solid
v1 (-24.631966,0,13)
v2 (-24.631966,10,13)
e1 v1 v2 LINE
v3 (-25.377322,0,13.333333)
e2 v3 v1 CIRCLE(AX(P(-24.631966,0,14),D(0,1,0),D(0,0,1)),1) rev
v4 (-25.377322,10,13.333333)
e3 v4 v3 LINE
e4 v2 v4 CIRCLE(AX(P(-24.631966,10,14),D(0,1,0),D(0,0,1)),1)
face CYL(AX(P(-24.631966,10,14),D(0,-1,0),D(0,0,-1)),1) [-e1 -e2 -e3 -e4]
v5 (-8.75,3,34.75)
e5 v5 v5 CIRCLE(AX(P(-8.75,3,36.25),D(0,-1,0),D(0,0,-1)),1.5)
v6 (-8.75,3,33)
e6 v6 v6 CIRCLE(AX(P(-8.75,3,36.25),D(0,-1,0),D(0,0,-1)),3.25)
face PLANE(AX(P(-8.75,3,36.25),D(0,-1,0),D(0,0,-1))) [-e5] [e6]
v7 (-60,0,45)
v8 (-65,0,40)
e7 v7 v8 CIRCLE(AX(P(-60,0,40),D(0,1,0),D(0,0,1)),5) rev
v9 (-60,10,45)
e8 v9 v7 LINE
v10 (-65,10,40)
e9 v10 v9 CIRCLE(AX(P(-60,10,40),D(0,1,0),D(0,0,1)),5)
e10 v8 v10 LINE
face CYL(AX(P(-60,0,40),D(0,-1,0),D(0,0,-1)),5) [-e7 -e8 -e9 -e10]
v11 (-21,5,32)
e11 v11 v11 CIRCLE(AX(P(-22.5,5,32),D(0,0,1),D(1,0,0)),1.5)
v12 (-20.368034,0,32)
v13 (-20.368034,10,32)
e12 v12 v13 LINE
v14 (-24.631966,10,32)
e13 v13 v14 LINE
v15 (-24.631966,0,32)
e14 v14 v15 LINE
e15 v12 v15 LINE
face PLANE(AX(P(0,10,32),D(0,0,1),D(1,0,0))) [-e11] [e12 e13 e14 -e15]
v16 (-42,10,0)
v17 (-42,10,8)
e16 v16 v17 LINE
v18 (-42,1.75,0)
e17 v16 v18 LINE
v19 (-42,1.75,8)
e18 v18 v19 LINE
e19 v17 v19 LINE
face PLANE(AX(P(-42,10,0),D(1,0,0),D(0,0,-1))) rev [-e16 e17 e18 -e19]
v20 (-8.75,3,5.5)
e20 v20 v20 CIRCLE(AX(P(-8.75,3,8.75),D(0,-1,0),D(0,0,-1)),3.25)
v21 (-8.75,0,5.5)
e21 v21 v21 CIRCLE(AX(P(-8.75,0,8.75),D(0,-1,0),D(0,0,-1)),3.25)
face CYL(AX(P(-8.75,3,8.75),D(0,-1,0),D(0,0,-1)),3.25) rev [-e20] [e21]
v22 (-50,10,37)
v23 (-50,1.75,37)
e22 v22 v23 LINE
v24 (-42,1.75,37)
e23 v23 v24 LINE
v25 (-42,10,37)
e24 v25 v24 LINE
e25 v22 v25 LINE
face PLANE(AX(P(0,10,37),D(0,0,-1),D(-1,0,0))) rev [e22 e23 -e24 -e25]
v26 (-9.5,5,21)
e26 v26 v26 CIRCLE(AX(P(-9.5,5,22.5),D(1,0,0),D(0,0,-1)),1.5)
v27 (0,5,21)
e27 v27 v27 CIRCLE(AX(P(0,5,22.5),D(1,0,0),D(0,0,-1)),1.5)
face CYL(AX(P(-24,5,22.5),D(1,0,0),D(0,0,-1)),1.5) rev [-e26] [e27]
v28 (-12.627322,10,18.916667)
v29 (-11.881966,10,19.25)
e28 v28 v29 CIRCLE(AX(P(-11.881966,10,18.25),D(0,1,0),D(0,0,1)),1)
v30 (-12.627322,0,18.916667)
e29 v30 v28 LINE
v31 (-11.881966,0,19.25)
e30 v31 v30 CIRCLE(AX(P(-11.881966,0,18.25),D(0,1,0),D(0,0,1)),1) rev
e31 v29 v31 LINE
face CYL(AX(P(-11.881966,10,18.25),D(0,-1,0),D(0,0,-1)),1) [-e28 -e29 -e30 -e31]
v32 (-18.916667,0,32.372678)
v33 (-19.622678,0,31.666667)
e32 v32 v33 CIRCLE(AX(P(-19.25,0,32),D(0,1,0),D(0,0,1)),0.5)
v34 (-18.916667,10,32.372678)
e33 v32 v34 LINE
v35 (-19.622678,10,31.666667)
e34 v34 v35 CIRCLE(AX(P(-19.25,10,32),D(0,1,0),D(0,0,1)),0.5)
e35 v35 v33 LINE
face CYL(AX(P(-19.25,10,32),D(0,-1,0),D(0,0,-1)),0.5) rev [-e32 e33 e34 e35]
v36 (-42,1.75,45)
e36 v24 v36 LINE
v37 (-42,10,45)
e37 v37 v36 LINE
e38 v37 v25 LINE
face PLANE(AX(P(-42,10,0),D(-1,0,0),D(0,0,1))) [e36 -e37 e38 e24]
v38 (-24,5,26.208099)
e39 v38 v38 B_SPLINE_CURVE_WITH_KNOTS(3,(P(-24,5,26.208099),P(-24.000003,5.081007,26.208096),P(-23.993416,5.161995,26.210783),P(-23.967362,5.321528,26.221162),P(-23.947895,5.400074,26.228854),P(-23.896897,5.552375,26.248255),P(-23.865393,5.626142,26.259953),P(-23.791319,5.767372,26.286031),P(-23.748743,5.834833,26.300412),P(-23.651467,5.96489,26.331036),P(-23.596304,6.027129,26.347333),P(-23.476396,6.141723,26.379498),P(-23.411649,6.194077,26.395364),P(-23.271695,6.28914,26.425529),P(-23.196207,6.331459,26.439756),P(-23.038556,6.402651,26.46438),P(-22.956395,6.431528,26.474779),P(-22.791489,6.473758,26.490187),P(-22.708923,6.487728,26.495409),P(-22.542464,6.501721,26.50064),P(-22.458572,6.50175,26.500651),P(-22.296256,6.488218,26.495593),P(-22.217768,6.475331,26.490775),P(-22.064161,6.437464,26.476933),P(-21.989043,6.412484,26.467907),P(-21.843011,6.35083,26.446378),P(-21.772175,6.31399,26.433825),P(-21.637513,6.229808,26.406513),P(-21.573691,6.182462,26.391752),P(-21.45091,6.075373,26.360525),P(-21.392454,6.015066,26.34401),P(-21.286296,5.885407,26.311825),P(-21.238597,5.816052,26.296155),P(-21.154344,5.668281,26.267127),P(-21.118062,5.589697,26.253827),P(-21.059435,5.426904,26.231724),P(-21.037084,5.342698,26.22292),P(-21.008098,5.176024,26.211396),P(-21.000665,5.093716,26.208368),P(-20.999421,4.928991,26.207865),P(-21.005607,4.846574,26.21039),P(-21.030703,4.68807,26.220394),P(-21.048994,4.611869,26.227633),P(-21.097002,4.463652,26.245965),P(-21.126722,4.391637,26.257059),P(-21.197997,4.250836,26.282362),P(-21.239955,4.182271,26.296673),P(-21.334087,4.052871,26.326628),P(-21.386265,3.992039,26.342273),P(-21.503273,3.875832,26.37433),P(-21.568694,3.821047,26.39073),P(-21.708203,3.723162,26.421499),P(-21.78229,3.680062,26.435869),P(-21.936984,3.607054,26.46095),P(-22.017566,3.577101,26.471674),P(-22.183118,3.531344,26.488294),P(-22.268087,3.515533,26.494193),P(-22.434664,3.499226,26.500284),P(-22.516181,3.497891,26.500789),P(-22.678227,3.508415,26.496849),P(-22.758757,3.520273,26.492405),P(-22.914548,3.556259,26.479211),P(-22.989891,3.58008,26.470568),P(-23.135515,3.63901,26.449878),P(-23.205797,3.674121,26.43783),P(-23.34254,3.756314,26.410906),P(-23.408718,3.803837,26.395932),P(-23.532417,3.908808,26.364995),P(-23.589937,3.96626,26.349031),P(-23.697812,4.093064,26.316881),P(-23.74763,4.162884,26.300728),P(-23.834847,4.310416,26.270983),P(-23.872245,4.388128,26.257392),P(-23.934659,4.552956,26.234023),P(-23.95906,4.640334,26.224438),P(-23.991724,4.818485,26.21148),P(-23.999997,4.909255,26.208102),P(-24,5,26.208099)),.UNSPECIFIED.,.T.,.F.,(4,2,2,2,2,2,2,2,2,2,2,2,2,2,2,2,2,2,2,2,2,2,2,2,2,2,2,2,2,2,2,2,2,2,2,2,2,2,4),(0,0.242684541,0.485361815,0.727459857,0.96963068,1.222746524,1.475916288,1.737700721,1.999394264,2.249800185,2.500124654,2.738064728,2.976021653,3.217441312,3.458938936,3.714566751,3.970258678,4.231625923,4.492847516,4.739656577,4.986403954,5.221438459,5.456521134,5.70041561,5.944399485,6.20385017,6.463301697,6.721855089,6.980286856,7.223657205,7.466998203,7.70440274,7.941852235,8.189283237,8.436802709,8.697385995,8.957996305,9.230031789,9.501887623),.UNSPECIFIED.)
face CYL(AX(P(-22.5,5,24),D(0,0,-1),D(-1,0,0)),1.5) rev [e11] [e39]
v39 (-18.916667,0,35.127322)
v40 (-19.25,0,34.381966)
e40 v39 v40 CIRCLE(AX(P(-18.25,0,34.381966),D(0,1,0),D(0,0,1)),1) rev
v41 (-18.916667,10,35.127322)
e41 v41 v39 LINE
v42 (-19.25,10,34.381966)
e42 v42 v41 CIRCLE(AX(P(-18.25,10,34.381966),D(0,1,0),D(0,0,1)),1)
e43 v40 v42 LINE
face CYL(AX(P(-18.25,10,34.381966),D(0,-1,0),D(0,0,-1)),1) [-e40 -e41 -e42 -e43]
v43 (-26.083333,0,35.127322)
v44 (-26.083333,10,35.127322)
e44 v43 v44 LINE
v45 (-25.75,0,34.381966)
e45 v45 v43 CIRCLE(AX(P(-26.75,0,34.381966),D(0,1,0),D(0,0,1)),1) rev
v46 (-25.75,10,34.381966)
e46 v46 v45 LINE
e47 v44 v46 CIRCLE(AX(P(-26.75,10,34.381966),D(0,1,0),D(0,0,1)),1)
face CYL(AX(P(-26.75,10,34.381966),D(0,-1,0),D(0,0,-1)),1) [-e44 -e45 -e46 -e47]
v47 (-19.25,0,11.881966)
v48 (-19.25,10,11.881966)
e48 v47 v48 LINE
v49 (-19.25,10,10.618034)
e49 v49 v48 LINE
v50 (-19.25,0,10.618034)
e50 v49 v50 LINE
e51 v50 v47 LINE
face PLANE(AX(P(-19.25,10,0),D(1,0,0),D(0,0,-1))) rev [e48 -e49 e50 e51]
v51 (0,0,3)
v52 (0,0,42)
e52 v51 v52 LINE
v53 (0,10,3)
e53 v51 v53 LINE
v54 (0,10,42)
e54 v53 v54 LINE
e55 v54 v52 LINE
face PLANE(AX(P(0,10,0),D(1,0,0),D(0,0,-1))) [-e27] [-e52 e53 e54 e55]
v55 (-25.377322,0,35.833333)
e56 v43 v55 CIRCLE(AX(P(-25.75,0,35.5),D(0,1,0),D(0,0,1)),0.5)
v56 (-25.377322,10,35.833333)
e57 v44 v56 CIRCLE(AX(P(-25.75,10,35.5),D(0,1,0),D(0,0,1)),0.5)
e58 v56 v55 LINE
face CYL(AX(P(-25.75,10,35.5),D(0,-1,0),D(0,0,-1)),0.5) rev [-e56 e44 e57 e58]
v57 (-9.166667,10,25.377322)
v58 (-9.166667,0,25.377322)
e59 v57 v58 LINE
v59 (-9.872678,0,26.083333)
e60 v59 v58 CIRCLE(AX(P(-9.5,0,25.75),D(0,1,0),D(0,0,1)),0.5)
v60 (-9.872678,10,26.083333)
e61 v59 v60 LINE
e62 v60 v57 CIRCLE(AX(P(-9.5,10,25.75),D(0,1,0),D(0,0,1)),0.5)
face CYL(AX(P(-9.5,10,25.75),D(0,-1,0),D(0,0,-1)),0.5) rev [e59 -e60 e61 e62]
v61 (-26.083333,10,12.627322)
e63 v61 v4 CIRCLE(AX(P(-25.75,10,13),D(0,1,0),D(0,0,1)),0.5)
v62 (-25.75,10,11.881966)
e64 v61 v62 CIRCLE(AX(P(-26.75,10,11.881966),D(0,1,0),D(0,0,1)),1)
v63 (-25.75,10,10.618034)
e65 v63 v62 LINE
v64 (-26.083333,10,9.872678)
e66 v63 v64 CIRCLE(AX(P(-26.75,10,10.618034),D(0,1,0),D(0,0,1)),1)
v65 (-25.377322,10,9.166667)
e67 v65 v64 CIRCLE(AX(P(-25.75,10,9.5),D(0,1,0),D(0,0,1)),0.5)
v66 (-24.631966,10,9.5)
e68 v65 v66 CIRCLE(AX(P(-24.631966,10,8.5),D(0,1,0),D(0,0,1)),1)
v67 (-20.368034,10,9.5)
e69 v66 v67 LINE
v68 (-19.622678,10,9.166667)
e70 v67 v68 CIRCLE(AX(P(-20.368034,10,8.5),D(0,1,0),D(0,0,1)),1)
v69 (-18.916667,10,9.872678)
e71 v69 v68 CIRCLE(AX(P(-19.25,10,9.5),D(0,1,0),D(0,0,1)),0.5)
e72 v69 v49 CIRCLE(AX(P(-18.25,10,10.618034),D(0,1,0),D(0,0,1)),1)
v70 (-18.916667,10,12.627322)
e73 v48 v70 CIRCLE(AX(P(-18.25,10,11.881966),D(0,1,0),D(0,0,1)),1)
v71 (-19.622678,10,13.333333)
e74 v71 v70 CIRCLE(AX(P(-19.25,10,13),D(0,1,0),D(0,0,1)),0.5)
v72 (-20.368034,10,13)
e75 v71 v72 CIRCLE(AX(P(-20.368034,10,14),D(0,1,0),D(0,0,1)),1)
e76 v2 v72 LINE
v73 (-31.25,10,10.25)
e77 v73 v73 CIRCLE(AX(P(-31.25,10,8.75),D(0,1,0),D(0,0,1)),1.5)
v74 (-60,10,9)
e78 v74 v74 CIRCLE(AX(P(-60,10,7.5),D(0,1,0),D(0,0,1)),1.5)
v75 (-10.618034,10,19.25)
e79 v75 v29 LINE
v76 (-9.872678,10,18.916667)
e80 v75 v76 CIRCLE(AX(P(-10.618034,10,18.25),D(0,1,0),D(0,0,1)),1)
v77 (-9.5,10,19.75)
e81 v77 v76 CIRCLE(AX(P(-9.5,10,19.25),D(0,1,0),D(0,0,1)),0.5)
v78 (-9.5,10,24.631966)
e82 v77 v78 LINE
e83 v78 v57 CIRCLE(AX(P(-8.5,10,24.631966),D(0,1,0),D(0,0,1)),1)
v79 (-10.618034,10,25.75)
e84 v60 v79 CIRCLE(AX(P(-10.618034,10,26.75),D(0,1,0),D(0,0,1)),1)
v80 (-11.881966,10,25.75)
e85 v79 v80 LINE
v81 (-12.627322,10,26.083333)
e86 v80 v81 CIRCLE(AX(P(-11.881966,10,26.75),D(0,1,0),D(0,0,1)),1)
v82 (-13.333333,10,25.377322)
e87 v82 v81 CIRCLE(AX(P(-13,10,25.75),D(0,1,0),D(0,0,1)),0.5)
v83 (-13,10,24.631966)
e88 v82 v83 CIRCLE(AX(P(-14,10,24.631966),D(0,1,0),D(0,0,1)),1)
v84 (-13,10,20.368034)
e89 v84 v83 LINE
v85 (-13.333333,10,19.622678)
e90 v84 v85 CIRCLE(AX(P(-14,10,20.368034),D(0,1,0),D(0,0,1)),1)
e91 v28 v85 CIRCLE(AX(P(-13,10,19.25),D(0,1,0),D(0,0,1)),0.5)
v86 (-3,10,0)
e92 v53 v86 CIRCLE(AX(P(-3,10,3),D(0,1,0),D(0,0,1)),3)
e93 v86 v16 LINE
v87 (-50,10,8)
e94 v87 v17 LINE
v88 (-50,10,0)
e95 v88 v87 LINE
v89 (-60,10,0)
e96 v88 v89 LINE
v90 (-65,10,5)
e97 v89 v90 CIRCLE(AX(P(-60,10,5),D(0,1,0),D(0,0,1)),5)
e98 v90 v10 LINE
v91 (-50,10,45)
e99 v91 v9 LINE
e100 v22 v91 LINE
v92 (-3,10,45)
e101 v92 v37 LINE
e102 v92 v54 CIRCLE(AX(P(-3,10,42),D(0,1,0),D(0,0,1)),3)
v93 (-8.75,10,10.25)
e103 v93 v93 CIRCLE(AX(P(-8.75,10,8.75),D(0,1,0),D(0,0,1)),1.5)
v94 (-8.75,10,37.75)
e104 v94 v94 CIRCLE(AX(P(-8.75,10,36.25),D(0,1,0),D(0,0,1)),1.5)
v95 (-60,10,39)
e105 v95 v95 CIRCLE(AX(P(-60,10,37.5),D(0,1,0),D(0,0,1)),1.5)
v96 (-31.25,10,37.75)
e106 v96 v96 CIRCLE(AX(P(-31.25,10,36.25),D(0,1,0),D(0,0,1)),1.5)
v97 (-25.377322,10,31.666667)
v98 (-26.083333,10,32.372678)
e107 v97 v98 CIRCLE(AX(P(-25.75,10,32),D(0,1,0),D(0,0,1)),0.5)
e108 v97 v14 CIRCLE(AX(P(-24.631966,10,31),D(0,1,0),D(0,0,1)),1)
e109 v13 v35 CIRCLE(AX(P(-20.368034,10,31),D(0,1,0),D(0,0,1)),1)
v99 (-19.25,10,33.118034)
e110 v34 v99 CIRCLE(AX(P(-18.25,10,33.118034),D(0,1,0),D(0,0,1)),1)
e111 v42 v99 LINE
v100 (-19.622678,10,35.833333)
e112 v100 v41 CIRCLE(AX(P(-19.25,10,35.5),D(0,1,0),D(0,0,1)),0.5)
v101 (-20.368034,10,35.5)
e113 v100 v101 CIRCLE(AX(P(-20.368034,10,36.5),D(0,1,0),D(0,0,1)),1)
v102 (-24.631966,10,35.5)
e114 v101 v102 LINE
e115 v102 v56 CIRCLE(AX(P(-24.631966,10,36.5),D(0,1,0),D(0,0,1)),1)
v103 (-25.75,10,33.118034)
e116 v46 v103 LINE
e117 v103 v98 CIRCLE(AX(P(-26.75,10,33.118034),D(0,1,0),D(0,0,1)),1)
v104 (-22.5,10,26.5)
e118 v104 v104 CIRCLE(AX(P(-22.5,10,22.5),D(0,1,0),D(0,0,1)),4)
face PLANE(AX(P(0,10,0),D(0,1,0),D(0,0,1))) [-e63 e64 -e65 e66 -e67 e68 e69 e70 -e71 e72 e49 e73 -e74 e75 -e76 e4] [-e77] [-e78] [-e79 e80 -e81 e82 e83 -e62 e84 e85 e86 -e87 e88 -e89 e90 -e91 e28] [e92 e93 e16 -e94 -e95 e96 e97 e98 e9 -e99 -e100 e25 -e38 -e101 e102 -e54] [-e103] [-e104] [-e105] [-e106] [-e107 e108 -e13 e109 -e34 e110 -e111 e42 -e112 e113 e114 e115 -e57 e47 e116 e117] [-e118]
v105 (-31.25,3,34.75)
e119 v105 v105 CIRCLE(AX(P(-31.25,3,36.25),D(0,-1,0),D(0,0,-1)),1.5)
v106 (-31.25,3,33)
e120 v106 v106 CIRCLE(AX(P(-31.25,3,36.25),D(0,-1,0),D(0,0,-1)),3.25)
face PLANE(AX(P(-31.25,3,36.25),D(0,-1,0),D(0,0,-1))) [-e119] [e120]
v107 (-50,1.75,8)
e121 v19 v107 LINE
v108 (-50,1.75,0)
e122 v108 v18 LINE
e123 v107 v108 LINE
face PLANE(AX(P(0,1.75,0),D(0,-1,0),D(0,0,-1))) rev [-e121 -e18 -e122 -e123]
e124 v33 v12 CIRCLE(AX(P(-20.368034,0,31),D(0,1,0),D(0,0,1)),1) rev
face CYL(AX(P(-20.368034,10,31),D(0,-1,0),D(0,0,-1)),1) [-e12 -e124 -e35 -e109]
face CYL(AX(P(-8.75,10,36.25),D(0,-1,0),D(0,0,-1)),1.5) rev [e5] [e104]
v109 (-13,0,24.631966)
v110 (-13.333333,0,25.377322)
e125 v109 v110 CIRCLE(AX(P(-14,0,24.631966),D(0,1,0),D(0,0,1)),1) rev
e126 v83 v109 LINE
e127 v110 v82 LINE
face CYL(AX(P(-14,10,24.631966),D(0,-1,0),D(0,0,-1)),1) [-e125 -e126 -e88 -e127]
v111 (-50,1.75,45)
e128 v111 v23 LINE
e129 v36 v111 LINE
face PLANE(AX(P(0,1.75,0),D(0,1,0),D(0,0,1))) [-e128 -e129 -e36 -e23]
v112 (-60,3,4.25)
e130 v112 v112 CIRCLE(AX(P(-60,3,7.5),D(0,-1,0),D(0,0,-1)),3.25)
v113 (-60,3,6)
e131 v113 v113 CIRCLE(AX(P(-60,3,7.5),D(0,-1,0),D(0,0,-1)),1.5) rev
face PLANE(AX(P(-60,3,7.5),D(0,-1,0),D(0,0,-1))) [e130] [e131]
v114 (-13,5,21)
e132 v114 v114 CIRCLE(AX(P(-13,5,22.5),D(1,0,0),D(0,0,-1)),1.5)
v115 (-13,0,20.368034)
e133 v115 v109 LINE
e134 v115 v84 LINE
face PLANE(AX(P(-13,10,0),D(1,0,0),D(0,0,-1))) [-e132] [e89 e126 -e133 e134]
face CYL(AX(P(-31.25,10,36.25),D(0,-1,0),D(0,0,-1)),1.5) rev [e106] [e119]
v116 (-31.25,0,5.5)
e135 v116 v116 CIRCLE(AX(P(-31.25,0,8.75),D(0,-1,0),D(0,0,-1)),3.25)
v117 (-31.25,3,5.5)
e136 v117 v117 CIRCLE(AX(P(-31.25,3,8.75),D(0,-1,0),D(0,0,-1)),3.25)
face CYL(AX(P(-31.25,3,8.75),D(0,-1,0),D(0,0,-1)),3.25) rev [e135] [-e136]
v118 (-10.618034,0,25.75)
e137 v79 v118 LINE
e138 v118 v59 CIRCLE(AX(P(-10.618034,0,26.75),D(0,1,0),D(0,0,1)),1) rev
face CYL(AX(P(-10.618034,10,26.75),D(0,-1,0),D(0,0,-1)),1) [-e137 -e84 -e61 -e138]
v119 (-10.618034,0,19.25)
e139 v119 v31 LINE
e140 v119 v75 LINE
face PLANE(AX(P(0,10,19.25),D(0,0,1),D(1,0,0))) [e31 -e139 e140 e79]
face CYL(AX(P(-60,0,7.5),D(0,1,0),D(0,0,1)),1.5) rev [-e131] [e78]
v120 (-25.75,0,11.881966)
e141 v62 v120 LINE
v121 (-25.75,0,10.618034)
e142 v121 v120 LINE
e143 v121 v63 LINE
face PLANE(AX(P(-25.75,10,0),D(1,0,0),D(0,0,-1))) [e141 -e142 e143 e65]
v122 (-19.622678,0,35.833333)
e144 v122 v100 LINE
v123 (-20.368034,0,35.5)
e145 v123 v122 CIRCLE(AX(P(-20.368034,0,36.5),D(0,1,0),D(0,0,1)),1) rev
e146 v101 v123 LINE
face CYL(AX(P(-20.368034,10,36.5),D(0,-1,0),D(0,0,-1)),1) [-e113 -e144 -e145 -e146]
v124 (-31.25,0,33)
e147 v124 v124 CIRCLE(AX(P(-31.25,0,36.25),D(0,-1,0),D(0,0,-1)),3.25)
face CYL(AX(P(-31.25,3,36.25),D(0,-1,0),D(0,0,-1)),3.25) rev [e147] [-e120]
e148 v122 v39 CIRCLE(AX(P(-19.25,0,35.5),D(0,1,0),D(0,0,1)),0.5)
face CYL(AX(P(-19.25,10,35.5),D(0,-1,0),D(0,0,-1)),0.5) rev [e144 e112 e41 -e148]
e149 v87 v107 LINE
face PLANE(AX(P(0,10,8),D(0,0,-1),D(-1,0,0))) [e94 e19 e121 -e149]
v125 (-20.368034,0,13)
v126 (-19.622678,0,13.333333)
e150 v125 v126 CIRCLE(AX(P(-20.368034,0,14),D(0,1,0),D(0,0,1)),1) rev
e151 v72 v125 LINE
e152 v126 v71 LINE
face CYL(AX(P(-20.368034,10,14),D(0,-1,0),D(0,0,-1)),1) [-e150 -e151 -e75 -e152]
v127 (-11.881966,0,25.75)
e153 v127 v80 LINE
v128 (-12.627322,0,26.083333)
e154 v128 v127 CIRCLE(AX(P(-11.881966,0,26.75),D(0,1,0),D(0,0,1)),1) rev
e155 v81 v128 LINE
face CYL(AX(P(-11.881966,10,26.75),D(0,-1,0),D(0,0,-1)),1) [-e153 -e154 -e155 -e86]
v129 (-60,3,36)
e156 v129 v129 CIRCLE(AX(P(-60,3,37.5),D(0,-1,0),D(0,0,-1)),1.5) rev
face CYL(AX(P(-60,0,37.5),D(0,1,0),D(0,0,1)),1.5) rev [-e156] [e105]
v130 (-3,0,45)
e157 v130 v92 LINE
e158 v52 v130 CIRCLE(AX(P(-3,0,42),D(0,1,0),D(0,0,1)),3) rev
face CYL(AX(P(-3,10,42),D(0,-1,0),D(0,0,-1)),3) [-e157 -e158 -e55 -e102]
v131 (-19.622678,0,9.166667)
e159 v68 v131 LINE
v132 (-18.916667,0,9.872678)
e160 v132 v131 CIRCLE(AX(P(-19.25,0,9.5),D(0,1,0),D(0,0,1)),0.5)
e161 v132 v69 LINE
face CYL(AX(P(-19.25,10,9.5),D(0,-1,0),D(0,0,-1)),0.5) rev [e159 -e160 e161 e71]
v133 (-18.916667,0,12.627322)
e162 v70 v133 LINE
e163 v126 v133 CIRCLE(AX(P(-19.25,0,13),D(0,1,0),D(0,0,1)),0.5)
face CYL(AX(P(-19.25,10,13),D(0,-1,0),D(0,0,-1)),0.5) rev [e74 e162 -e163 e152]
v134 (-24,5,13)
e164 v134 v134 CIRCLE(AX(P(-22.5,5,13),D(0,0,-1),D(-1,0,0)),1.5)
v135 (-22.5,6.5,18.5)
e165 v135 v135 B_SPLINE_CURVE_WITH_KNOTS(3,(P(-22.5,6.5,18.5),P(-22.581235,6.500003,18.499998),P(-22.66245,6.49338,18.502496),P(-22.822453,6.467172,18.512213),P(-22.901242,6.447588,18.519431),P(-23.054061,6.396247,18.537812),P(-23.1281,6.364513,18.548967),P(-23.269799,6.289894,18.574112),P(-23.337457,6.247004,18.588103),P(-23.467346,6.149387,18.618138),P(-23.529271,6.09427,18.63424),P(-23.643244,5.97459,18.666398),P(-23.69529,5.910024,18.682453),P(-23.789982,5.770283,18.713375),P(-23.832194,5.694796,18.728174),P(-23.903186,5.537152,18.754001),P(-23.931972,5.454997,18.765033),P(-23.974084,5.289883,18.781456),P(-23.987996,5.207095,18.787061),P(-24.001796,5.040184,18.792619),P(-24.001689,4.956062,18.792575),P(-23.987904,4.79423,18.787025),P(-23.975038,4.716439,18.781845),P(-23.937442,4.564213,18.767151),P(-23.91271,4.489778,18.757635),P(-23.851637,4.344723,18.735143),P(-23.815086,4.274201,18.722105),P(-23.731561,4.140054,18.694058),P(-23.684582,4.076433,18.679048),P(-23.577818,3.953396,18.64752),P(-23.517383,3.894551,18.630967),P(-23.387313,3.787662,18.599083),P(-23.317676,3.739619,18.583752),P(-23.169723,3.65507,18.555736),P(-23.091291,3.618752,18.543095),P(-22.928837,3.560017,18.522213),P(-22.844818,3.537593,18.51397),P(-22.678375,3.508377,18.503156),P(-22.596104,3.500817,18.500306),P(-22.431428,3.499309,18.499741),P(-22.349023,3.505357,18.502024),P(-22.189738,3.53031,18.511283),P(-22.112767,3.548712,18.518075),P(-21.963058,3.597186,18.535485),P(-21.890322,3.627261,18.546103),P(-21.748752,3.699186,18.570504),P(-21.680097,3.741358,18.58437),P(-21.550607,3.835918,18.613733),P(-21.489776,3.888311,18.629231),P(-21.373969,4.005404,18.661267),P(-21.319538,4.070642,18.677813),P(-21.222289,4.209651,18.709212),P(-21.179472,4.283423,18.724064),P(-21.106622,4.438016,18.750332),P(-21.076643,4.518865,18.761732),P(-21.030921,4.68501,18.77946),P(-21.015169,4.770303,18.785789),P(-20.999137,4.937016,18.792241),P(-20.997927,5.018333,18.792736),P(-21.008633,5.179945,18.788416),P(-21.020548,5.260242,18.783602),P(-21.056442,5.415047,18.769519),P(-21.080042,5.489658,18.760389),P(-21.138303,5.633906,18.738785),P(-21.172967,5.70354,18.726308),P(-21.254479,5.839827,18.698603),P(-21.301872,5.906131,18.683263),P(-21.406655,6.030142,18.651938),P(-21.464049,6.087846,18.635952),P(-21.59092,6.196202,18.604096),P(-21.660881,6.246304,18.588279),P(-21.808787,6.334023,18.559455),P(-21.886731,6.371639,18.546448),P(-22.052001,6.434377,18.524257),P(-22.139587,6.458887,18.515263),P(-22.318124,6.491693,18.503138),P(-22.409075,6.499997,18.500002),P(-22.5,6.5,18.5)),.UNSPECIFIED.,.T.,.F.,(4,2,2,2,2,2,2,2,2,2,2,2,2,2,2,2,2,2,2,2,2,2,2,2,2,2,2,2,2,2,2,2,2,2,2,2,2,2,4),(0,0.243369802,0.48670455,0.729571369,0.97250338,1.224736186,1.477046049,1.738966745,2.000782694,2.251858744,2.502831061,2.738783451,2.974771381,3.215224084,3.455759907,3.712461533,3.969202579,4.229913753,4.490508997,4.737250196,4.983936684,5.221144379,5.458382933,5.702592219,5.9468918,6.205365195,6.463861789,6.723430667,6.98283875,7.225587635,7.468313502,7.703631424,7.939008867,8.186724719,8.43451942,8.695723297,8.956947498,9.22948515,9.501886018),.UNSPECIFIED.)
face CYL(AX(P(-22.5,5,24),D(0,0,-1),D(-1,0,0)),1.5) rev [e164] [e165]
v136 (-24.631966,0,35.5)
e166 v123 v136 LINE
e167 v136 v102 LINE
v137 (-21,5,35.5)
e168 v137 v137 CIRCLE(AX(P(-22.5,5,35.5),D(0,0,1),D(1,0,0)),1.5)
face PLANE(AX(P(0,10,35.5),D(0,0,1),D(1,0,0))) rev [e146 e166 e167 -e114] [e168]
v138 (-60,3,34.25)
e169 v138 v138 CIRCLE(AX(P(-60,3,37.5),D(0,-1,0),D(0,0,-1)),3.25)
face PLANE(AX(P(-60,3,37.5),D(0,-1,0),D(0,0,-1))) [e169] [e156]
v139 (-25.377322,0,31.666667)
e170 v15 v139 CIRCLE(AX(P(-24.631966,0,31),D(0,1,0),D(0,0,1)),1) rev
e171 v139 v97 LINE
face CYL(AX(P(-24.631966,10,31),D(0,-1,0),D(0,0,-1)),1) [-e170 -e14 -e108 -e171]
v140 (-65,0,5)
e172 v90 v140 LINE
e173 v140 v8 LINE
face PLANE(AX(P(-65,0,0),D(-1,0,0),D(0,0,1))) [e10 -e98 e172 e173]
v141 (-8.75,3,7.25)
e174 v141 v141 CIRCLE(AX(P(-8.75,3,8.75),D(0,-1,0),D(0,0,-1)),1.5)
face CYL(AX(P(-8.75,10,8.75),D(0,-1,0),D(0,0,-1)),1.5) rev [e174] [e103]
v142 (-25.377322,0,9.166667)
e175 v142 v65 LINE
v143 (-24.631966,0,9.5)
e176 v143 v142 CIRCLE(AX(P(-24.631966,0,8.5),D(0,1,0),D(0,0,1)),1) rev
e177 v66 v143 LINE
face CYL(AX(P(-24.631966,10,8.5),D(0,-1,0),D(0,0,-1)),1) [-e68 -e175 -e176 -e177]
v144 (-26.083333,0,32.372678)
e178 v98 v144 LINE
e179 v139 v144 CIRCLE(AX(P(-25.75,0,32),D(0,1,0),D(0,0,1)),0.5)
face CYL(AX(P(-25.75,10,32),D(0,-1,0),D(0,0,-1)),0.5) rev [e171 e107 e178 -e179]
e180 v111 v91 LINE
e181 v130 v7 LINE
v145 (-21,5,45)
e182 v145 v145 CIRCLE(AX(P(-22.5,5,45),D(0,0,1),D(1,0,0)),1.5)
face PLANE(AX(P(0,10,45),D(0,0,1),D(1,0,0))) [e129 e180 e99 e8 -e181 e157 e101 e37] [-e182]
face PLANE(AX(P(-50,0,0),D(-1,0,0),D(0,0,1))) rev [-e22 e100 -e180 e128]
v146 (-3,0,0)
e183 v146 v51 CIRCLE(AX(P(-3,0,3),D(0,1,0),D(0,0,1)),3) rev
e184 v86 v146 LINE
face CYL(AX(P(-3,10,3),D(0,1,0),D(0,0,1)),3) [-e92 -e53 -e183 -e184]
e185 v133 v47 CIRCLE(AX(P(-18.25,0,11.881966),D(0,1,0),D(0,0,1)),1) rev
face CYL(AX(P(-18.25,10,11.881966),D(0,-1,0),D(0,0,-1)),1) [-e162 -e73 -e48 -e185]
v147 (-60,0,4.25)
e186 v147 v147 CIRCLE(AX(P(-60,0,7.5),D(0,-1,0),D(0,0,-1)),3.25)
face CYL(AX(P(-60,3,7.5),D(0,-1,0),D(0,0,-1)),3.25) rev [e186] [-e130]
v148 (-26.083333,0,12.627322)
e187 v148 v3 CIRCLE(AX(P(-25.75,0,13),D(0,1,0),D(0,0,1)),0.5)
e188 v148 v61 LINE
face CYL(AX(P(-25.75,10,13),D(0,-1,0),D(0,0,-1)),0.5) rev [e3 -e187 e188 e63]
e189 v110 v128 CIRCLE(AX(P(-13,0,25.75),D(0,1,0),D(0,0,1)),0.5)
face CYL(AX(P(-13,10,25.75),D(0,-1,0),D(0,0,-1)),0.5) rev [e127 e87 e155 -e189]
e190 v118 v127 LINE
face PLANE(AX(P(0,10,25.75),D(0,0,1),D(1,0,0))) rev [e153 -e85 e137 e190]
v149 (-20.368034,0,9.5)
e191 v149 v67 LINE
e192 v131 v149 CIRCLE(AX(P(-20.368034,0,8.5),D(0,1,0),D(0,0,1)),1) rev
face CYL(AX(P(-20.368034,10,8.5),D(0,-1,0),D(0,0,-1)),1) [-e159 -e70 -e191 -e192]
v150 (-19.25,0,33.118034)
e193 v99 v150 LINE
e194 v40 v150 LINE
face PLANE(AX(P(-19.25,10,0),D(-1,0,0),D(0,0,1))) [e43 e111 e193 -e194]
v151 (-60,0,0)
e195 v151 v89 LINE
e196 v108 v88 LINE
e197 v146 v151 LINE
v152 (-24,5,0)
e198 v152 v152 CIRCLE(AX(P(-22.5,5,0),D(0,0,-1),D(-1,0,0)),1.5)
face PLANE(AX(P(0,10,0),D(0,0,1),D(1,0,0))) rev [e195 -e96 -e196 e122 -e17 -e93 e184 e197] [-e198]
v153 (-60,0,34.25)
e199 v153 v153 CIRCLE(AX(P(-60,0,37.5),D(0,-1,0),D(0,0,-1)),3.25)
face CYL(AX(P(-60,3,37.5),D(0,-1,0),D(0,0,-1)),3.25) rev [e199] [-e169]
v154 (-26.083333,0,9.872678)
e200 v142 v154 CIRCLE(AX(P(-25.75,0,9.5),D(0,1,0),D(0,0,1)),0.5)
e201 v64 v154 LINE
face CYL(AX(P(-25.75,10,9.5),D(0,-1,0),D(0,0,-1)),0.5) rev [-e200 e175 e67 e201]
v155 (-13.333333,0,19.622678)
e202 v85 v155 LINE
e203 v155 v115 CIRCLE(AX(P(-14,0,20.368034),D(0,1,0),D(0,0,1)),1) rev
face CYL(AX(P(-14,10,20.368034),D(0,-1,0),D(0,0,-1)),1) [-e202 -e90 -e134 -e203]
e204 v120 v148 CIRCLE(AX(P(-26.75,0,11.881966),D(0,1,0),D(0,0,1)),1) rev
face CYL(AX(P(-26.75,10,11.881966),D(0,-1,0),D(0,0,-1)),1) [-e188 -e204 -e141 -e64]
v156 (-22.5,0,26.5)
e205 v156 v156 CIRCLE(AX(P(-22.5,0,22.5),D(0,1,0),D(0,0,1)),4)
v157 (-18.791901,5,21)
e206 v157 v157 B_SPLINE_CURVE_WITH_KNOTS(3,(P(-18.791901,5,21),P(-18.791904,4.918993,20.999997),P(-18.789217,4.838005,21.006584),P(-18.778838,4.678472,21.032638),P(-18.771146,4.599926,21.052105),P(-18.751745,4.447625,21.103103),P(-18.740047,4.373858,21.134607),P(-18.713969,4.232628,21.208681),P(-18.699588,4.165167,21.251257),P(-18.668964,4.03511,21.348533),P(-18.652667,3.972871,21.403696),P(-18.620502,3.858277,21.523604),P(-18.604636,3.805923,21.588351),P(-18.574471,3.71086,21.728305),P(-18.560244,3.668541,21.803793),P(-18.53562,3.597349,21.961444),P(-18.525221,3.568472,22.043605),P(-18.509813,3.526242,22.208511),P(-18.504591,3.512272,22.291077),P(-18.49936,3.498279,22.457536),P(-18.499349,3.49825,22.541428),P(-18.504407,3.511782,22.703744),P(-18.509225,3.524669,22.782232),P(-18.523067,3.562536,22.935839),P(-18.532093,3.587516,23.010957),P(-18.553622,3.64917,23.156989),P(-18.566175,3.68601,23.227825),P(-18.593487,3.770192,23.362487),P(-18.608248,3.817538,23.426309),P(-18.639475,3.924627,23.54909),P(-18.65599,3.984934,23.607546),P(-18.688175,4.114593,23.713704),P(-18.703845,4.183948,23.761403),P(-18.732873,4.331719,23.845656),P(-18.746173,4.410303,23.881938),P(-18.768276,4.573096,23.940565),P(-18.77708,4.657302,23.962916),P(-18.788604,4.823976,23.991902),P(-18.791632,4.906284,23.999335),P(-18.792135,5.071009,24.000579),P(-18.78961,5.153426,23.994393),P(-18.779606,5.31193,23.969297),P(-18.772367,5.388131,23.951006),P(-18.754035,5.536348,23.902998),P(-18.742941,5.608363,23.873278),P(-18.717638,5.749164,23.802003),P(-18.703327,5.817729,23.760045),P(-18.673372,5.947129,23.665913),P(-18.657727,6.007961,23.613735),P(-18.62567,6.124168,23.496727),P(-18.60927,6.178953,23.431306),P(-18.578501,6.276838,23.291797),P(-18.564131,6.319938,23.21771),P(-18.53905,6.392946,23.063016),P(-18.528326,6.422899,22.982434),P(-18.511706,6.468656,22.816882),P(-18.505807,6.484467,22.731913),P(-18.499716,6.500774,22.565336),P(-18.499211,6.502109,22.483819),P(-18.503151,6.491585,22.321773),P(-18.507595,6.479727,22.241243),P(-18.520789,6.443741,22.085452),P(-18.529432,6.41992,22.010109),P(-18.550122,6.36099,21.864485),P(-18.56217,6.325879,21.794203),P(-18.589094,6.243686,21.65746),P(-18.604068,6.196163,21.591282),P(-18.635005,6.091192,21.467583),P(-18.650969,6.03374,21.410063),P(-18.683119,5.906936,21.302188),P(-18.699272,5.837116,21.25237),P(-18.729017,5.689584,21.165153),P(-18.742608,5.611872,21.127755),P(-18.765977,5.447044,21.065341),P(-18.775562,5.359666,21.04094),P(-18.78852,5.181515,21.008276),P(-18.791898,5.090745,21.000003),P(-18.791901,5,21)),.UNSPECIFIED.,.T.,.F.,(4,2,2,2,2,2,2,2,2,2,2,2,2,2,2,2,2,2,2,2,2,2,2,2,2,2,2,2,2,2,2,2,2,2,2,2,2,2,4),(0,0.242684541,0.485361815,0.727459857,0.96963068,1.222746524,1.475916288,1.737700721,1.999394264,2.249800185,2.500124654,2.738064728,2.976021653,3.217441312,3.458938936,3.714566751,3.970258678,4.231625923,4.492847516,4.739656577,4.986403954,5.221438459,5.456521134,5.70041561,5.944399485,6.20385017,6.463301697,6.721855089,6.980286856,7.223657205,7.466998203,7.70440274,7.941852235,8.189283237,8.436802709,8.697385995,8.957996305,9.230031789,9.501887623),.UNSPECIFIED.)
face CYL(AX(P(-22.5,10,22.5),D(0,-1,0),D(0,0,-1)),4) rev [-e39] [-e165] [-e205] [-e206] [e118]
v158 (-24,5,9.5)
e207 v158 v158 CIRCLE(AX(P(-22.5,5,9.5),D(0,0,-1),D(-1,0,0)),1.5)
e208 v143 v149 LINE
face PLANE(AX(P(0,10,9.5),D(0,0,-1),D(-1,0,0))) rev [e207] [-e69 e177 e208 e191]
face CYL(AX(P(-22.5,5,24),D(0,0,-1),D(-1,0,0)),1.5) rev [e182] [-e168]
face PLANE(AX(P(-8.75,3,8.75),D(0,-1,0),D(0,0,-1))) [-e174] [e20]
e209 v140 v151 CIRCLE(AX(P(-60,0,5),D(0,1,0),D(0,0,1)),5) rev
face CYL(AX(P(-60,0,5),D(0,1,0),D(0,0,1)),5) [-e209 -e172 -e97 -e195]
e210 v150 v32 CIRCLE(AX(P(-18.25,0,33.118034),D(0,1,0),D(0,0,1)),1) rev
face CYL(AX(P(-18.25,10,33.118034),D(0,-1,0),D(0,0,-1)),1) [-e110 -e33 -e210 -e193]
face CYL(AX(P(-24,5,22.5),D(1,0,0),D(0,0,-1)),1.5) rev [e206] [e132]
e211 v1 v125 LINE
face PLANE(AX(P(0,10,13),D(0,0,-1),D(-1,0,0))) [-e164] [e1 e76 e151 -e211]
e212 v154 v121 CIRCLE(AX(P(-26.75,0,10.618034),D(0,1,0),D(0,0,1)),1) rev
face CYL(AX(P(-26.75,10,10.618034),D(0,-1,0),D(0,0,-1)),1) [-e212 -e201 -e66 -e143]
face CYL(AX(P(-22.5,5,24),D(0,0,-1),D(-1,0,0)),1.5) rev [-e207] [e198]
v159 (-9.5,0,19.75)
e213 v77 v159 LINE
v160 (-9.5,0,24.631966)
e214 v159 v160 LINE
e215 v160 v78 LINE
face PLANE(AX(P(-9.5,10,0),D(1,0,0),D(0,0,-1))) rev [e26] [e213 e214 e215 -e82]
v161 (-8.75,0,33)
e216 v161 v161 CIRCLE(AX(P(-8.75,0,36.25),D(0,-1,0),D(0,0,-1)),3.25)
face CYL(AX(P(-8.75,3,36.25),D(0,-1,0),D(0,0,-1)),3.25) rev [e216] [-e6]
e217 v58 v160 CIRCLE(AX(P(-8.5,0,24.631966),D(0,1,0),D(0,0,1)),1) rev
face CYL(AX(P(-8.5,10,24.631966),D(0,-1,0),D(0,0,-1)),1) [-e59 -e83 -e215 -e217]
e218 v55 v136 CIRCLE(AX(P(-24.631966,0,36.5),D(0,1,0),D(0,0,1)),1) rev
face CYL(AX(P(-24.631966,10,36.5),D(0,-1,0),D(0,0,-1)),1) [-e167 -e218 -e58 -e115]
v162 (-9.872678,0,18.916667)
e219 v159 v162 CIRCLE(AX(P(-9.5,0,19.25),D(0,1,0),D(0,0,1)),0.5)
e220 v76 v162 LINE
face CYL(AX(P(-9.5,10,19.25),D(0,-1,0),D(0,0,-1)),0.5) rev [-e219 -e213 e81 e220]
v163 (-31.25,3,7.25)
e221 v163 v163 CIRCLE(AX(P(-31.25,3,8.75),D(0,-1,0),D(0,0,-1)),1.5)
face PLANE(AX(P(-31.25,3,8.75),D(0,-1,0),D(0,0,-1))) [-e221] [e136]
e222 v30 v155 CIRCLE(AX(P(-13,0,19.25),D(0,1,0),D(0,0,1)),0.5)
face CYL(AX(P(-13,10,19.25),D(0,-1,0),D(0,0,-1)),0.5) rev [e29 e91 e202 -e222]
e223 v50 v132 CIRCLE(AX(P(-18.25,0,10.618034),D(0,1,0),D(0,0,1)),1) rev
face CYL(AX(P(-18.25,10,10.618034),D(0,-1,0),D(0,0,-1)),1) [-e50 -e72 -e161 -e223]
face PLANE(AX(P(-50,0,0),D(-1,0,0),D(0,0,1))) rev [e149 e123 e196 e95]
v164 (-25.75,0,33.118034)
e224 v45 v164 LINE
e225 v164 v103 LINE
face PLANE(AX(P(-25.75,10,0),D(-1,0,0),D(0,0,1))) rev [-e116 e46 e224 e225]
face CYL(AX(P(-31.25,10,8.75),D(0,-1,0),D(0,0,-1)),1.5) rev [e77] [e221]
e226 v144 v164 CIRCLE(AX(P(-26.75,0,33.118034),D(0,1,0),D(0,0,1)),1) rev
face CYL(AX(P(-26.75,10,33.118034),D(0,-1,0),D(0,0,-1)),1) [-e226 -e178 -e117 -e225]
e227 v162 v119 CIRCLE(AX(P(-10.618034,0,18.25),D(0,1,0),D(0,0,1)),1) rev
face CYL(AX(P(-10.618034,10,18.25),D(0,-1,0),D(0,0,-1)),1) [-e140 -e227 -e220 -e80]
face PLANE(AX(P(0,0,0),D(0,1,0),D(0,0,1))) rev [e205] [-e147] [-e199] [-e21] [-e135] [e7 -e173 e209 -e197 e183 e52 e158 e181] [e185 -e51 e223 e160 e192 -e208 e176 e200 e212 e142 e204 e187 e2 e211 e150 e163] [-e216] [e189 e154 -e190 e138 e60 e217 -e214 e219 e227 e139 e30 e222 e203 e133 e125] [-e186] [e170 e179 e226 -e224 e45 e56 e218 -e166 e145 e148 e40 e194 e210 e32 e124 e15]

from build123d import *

# Parameters (mm, degrees)
SKETCH1_R             = 4
SKETCH1_R_2           = 1.5
BOSS_EXTRUDE1_DEPTH   = 10
FILLET1_R             = 3
FILLET2_R             = 1
CUT_EXTRUDE1_DEPTH    = 24
CIRPATTERN1_OUTLINE_R = 1.5
CIRPATTERN1_DEPTH     = 45
SKETCH3_W             = 15
SKETCH3_H             = 45
SKETCH3_R             = 1.5
BOSS_EXTRUDE2_DEPTH   = 10
FILLET3_R             = 5
SKETCH4_R             = 3.25
CUT_EXTRUDE2_DEPTH    = 3
SKETCH5_W             = 8
SKETCH5_H             = 8
BOSS_EXTRUDE3_DEPTH   = 1.75


# Read off the part's stored shape, not the designer's step: CirPattern1
with BuildPart() as part:
    # Sketch1 → Boss-Extrude1 (new body)
    with BuildSketch(Plane(origin=(0, 0, 0), x_dir=(1, 0, 0), z_dir=(0, 1, 0))):
        Polygon((0, 0), (-42, 0), (-42, -8), (-50, -8), (-50, -37), (-42, -37), (-42, -45), (0, -45), align=None)
        with Locations(Location((-22.5, -22.5, 0), (0, 0, 270))):
            Circle(SKETCH1_R, mode=Mode.SUBTRACT)
        with BuildLine():
            Line((-19.75, -13), (-25.25, -13))
            ThreePointArc((-25.25, -13), (-26.103553391, -13.353553391), (-25.75, -12.5))
            Line((-25.75, -12.5), (-25.75, -10))
            ThreePointArc((-25.75, -10), (-26.103553391, -9.146446609), (-25.25, -9.5))
            Line((-25.25, -9.5), (-19.75, -9.5))
            ThreePointArc((-19.75, -9.5), (-18.896446609, -9.146446609), (-19.25, -10))
            Line((-19.25, -10), (-19.25, -12.5))
            ThreePointArc((-19.25, -12.5), (-18.896446609, -13.353553391), (-19.75, -13))
        make_face(mode=Mode.SUBTRACT)
        with Locations(Location((-31.25, -8.75, 0), (0, 0, 270))):
            Circle(SKETCH1_R_2, mode=Mode.SUBTRACT)
        with Locations(Location((-31.25, -36.25, 0), (0, 0, 270))):
            Circle(SKETCH1_R_2, mode=Mode.SUBTRACT)
        with Locations(Location((-8.75, -36.25, 0), (0, 0, 270))):
            Circle(SKETCH1_R_2, mode=Mode.SUBTRACT)
        with Locations(Location((-8.75, -8.75, 0), (0, 0, 270))):
            Circle(SKETCH1_R_2, mode=Mode.SUBTRACT)
        with BuildLine():
            Line((-9.5, -19.75), (-9.5, -25.25))
            ThreePointArc((-9.5, -25.25), (-9.146446609, -26.103553391), (-10, -25.75))
            Line((-10, -25.75), (-12.5, -25.75))
            ThreePointArc((-12.5, -25.75), (-13.353553391, -26.103553391), (-13, -25.25))
            Line((-13, -25.25), (-13, -19.75))
            ThreePointArc((-13, -19.75), (-13.353553391, -18.896446609), (-12.5, -19.25))
            Line((-12.5, -19.25), (-10, -19.25))
            ThreePointArc((-10, -19.25), (-9.146446609, -18.896446609), (-9.5, -19.75))
        make_face(mode=Mode.SUBTRACT)
        with BuildLine():
            ThreePointArc((-19.25, -35), (-18.896446609, -35.853553391), (-19.75, -35.5))
            Line((-19.75, -35.5), (-25.25, -35.5))
            ThreePointArc((-25.25, -35.5), (-26.103553391, -35.853553391), (-25.75, -35))
            Line((-25.75, -35), (-25.75, -32.5))
            ThreePointArc((-25.75, -32.5), (-26.103553391, -31.646446609), (-25.25, -32))
            Line((-25.25, -32), (-19.75, -32))
            ThreePointArc((-19.75, -32), (-18.896446609, -31.646446609), (-19.25, -32.5))
            Line((-19.25, -32.5), (-19.25, -35))
        make_face(mode=Mode.SUBTRACT)
    extrude(amount=BOSS_EXTRUDE1_DEPTH)

    # Fillet1
    fillet1_edges = [part.edges().sort_by_distance(p)[0] for p in [
        (0, 5, 45),
        (0, 5, 0),
    ]]
    fillet(fillet1_edges, radius=FILLET1_R)

    # Fillet2
    fillet2_edges = [part.edges().sort_by_distance(p)[0] for p in [
        (-25.75, 5, 32.5),
        (-25.75, 5, 35),
        (-25.25, 5, 35.5),
        (-19.75, 5, 35.5),
        (-19.25, 5, 35),
        (-19.25, 5, 32.5),
        (-19.75, 5, 32),
        (-25.25, 5, 32),
        (-19.25, 5, 12.5),
        (-19.25, 5, 10),
        (-19.75, 5, 9.5),
        (-25.25, 5, 9.5),
        (-25.75, 5, 10),
        (-25.75, 5, 12.5),
        (-25.25, 5, 13),
        (-19.75, 5, 13),
        (-10, 5, 19.25),
        (-12.5, 5, 19.25),
        (-13, 5, 19.75),
        (-13, 5, 25.25),
        (-12.5, 5, 25.75),
        (-10, 5, 25.75),
        (-9.5, 5, 25.25),
    ]]
    fillet(fillet2_edges, radius=FILLET2_R)

    # Sketch2 → Cut-Extrude1 (cut)
    with BuildSketch(Plane(origin=(0, 0, 0), x_dir=(0, 0, -1), z_dir=(1, 0, 0))):
        with BuildLine():
            ThreePointArc((-21, 5), (-21.439339828, 6.060660172), (-22.5, 6.5))
            Line((-22.5, 6.5), (-22.5, 3.5))
            ThreePointArc((-22.5, 3.5), (-21.439339828, 3.939339828), (-21, 5))
        make_face()
        with BuildLine():
            Line((-22.5, 3.5), (-22.5, 6.5))
            ThreePointArc((-22.5, 6.5), (-24, 5), (-22.5, 3.5))
        make_face()
    extrude(amount=-CUT_EXTRUDE1_DEPTH, mode=Mode.SUBTRACT)

    # CirPattern1 outline → CirPattern1 (cut)
    with BuildSketch(Plane.XY):
        with Locations((-22.5, 5)):
            Circle(CIRPATTERN1_OUTLINE_R)
    extrude(amount=CIRPATTERN1_DEPTH, mode=Mode.SUBTRACT)

    # Sketch3 → Boss-Extrude2 (add)
    with BuildSketch(Plane(origin=(0, 10, 0), x_dir=(1, 0, 0), z_dir=(0, 1, 0))):
        with Locations((-57.5, -22.5)):
            Rectangle(SKETCH3_W, SKETCH3_H)
        with Locations(Location((-60, -37.5, 0), (0, 0, 270))):
            Circle(SKETCH3_R, mode=Mode.SUBTRACT)
        with Locations(Location((-60, -7.5, 0), (0, 0, 270))):
            Circle(SKETCH3_R, mode=Mode.SUBTRACT)
    extrude(amount=-BOSS_EXTRUDE2_DEPTH)

    # Fillet3
    fillet3_edges = [part.edges().sort_by_distance(p)[0] for p in [
        (-65, 5, 0),
        (-65, 5, 45),
    ]]
    fillet(fillet3_edges, radius=FILLET3_R)

    # Sketch4 → Cut-Extrude2 (cut)
    with BuildSketch(Plane.XZ):
        with Locations(Location((-31.25, 36.25, 0), (0, 0, 270))):
            Circle(SKETCH4_R)
        with Locations(Location((-8.75, 36.25, 0), (0, 0, 270))):
            Circle(SKETCH4_R)
        with Locations(Location((-8.75, 8.75, 0), (0, 0, 270))):
            Circle(SKETCH4_R)
        with Locations(Location((-31.25, 8.75, 0), (0, 0, 270))):
            Circle(SKETCH4_R)
        with Locations(Location((-60, 37.5, 0), (0, 0, 270))):
            Circle(SKETCH4_R)
        with Locations(Location((-60, 7.5, 0), (0, 0, 270))):
            Circle(SKETCH4_R)
    extrude(amount=-CUT_EXTRUDE2_DEPTH, mode=Mode.SUBTRACT)

    # Sketch5 → Boss-Extrude3 (add)
    with BuildSketch(Plane.XZ):
        with Locations((-46, 41)):
            Rectangle(SKETCH5_W, SKETCH5_H)
        with Locations((-46, 4)):
            Rectangle(SKETCH5_W, SKETCH5_H)
    extrude(amount=-BOSS_EXTRUDE3_DEPTH)


solid = part.part
